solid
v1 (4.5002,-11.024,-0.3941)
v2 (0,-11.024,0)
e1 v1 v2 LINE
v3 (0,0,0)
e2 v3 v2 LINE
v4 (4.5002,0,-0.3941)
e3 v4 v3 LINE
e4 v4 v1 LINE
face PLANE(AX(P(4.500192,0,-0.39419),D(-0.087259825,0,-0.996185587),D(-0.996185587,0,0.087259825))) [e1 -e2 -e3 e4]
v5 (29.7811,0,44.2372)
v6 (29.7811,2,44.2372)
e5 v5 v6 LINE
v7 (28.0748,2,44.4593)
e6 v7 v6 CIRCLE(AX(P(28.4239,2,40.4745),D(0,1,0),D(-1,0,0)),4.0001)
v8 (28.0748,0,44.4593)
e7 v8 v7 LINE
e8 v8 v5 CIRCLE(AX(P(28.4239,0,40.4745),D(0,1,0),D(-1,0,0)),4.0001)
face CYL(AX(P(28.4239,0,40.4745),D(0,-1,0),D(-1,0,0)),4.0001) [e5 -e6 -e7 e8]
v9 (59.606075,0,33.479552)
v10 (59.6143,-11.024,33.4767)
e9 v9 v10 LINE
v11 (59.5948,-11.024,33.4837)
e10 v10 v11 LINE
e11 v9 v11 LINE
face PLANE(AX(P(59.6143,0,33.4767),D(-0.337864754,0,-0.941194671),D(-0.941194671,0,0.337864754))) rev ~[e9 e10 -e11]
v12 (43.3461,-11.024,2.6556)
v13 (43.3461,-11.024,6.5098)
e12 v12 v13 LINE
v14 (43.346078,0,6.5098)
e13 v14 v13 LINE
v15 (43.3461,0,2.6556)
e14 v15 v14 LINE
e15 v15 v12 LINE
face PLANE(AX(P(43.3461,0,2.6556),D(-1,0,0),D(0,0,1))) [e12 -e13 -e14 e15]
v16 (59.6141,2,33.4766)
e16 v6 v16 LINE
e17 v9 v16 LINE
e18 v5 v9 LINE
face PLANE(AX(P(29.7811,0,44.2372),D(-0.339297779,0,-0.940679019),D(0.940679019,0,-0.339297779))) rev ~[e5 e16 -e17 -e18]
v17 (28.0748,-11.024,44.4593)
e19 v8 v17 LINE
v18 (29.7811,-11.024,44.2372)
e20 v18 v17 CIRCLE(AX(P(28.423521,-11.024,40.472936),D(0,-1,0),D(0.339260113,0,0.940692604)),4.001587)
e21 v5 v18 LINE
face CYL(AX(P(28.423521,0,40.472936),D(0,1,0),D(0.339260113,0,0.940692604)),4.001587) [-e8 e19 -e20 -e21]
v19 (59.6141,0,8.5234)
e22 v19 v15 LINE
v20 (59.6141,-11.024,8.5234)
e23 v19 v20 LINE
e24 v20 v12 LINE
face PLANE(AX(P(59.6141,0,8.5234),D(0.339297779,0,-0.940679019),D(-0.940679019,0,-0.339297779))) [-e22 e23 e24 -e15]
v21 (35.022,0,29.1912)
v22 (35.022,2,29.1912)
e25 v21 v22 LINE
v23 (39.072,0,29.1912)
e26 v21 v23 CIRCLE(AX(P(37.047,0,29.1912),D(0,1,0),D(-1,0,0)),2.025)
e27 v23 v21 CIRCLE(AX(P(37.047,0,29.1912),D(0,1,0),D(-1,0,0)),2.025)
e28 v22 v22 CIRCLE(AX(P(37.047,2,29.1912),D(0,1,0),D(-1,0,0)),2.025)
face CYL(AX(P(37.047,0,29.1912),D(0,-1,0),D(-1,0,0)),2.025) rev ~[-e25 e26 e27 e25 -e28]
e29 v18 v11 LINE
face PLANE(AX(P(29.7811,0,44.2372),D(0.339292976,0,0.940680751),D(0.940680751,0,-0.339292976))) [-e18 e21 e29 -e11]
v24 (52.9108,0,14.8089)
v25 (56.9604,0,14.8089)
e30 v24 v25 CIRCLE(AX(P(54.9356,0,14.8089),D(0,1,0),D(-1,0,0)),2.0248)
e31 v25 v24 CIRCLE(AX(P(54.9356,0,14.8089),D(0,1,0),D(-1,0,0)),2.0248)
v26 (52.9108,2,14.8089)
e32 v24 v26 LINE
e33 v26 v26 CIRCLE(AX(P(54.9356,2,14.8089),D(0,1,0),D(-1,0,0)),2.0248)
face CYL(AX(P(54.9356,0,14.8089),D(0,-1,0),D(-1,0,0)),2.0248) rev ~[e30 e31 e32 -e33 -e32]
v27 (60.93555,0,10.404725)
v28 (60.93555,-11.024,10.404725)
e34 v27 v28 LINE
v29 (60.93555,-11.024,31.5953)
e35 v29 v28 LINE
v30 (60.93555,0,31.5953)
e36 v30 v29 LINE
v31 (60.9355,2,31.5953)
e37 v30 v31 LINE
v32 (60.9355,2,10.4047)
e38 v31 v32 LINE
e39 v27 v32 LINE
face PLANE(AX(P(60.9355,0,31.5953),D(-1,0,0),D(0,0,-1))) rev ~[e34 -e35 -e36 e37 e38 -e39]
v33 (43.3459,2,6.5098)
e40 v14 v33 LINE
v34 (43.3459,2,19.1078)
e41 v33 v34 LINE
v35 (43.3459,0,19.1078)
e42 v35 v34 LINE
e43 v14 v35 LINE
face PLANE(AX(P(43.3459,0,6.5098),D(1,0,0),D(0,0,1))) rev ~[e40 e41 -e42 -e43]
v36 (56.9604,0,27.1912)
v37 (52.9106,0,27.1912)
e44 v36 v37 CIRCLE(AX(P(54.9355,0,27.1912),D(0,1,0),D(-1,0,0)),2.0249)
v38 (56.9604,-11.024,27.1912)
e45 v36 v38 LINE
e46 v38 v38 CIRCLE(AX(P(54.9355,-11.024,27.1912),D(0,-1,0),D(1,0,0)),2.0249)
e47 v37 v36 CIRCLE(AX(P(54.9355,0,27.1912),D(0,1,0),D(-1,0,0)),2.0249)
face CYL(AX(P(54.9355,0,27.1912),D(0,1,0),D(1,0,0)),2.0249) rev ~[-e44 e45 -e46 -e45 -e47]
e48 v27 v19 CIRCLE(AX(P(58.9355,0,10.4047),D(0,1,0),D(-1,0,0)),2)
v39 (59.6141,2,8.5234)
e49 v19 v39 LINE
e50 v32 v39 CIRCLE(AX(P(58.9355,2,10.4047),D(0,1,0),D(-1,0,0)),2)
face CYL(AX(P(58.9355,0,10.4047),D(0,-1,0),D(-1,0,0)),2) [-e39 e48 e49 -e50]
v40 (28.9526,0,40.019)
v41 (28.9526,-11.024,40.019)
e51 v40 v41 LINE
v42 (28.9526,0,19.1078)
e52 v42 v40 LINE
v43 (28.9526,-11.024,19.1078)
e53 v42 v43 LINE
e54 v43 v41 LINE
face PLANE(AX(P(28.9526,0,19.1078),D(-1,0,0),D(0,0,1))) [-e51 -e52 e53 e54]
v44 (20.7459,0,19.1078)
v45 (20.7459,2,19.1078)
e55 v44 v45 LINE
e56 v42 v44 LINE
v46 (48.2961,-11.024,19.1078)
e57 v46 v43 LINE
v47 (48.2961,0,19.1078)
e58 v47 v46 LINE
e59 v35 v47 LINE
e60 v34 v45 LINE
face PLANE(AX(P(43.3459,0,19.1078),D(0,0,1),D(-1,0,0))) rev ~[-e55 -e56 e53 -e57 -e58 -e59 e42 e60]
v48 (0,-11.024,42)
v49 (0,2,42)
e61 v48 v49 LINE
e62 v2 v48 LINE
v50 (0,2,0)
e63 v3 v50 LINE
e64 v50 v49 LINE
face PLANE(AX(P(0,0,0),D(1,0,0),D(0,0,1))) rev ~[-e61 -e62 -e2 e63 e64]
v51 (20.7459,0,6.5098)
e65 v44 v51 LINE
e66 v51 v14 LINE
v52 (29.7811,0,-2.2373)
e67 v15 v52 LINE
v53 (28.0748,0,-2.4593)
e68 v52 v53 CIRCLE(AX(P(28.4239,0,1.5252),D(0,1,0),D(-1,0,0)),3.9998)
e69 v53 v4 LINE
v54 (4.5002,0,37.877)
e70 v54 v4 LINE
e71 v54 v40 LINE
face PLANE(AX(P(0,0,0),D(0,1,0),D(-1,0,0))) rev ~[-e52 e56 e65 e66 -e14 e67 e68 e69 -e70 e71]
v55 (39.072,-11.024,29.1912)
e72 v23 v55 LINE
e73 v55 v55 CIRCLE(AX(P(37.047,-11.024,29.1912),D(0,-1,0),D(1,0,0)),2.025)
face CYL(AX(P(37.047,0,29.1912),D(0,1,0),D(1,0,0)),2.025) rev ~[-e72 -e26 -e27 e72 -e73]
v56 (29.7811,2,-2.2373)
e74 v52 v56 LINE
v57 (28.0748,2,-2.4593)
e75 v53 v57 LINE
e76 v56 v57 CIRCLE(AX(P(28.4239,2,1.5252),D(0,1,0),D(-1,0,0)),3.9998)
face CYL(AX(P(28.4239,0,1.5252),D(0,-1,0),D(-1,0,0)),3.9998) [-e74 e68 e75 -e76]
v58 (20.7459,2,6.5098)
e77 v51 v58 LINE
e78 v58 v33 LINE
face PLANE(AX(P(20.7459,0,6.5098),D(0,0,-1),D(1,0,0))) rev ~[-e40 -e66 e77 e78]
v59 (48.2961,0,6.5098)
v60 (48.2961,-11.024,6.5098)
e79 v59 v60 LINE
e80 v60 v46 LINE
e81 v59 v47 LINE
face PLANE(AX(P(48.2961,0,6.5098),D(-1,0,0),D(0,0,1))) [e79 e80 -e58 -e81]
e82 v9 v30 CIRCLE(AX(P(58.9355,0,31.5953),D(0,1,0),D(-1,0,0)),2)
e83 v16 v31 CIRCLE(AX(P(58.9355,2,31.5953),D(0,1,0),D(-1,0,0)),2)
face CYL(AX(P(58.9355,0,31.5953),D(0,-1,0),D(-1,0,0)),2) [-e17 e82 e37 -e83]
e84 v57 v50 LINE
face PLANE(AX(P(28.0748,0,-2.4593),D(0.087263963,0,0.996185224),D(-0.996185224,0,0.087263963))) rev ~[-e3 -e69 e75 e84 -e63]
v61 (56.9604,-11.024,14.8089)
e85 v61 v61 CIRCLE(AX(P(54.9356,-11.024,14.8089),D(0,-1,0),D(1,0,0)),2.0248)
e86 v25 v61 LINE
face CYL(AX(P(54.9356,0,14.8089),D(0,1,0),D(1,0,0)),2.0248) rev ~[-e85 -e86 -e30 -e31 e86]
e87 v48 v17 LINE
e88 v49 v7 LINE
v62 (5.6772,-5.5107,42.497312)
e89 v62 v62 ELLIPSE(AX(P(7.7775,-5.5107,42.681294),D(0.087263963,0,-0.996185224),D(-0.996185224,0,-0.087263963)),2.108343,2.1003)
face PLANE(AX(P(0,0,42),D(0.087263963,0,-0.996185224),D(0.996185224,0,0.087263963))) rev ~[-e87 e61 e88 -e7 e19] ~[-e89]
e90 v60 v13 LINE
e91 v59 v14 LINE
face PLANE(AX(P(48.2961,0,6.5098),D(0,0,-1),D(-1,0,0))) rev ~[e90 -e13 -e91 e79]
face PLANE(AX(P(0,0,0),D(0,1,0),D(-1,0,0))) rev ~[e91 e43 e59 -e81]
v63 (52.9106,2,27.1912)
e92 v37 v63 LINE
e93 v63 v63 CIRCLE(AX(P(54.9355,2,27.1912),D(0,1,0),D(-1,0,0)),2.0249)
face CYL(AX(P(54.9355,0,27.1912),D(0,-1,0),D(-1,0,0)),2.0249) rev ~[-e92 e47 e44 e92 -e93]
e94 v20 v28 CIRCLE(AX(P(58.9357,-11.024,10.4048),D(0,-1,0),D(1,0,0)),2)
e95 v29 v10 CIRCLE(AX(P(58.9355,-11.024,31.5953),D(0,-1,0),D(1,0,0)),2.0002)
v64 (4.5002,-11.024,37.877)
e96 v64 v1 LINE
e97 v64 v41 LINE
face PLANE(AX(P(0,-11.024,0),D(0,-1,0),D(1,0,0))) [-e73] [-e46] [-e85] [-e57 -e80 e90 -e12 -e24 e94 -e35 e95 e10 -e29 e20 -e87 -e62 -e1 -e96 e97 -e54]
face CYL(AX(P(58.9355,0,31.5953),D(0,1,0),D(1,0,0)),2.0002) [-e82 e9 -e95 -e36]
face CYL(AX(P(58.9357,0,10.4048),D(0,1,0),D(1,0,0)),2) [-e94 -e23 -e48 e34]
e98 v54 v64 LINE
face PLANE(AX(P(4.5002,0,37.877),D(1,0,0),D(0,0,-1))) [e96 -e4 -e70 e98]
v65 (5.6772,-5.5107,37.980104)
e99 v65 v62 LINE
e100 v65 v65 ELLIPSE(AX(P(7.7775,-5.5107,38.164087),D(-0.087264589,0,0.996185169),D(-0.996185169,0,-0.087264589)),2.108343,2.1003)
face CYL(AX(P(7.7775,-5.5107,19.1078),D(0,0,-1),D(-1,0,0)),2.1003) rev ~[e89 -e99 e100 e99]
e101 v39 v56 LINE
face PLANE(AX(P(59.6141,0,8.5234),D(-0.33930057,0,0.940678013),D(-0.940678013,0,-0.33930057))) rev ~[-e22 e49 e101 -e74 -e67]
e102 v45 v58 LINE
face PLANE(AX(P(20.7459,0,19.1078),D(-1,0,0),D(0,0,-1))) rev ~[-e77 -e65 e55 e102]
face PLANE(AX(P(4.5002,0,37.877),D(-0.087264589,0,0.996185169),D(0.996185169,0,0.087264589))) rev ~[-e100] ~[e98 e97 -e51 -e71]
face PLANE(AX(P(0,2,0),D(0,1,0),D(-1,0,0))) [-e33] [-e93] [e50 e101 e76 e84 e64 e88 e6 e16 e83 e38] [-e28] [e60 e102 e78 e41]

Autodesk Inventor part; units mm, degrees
ref_plane "YZ Plane" through (0, 0, 0) normal (1, 0, 0) x (0, 1, 0)
ref_plane "XZ Plane" through (0, 0, 0) normal (0, 1, 0) x (-1, 0, 0)
ref_plane "XY Plane" through (0, 0, 0) normal (0, 0, 1) x (1, 0, 0)
sketch "Szkic1" plane through (0, 0, 0) normal (0, 1, 0) x (-1, 0, 0)
  line L0 (0, 0) -> (0, 42)
  line L1 (-28.0748, -2.4593) -> (0, 0)
  line L2 (-59.6141, 8.5234) -> (-29.7811, -2.2373)
  circle A0 centre (-54.9356, 14.8089) radius 2.0248
  circle A1 centre (-54.9355, 27.1912) radius 2.0249
  circle A2 centre (-37.047, 29.1912) radius 2.025
  line L3 (0, 42) -> (-28.0748, 44.4593)
  line L4 (-29.7811, 44.2372) -> (-59.6141, 33.4766)
  circle A3 centre (-28.4239, 40.4745) radius 4.0001
  circle A4 centre (-58.9355, 31.5953) radius 2
  line L5 (-60.9355, 31.5953) -> (-60.9355, 10.4047)
  circle A5 centre (-58.9355, 10.4047) radius 2
  circle A6 centre (-28.4239, 1.5252) radius 3.9998
  line L6 (-43.3459, 19.1078) -> (-20.7459, 19.1078)
  line L7 (-20.7459, 19.1078) -> (-20.7459, 6.5098)
  line L8 (-20.7459, 6.5098) -> (-43.3459, 6.5098)
  line L9 (-43.3459, 6.5098) -> (-43.3459, 19.1078)
  point P0 (-40, 21)
extrude "Wyciągnięcie proste1" add sketch "Szkic1" along normal blind 2
sketch "Szkic2" plane through (0, 0, 0) normal (0, -1, 0) x (1, 0, 0)
  line L0 (4.5002, 37.877) -> (28.9526, 40.019)
  line L1 (28.9526, 19.1078) -> (28.9526, 40.019)
  line L2 (43.3459, 19.1078) -> (48.2961, 19.1078)
  line L3 (48.2961, 6.5098) -> (48.2961, 19.1078)
  line L4 (43.3461, 2.6556) -> (43.3461, 6.5098)
  line L5 (48.2961, 6.5098) -> (43.3459, 6.5098)
  circle A0 centre (58.9357, 10.4048) radius 2
  line L6 (59.6143, 33.4767) -> (59.5948, 33.4837)
  circle A1 centre (58.9355, 31.5953) radius 2.0002
  line L7 (4.5002, 37.877) -> (4.5002, -0.3941)
  line L8 (28.075, -2.4592) -> (28.052, -2.4572)
  arc A2 (60.9355, 31.5953) -> (59.6141, 33.4766) centre (58.9355, 31.5953) ccw projected
  arc A3 (59.6141, 8.5234) -> (60.9355, 10.4047) centre (58.9355, 10.4047) ccw projected
  circle A4 centre (37.047, 29.1912) radius 2.025 projected
  circle A5 centre (54.9356, 14.8089) radius 2.0248 projected
  circle A6 centre (54.9355, 27.1912) radius 2.0249 projected
  line L9 (0, 42) -> (28.0748, 44.4593) projected
  line L10 (0, 0) -> (0, 42) projected
  line L11 (28.0748, -2.4593) -> (0, 0) projected
  arc A7 (28.0748, -2.4593) -> (29.7811, -2.2372) centre (28.4239, 1.5252) ccw projected
  line L12 (59.6141, 8.5234) -> (29.7811, -2.2372) projected
  arc A8 (59.6141, 8.5234) -> (60.9355, 10.4047) centre (58.9355, 10.4047) ccw projected
  line L13 (60.9355, 31.5953) -> (60.9355, 10.4047) projected
  arc A9 (60.9355, 31.5953) -> (59.6141, 33.4766) centre (58.9355, 31.5953) ccw projected
  line L14 (29.7811, 44.2372) -> (59.6141, 33.4766) projected
  arc A10 (29.7811, 44.2372) -> (28.0748, 44.4593) centre (28.4239, 40.4745) ccw projected
  circle A11 centre (37.047, 29.1912) radius 2.025 projected
  circle A12 centre (54.9356, 14.8089) radius 2.0248 projected
  circle A13 centre (54.9355, 27.1912) radius 2.0249 projected
  line L15 (43.3459, 6.5098) -> (43.3459, 19.1078) projected
  line L16 (20.7459, 6.5098) -> (43.3459, 6.5098) projected
  line L17 (20.7459, 19.1078) -> (20.7459, 6.5098) projected
  line L18 (43.3459, 19.1078) -> (20.7459, 19.1078) projected
  line L19 (4.5002, -0.3941) -> (4.5002, -2.2372)
  line L20 (28.9526, 19.1078) -> (28.9526, 16.8338)
  line L21 (43.3459, 6.5098) -> (42.3677, 6.5098)
  line L22 (43.3459, 6.5098) -> (43.3459, 8.4048)
  line L23 (43.3459, 6.5098) -> (43.3459, 19.1078) projected
  line L24 (43.3459, 19.1078) -> (42.3677, 19.1078)
  line L25 (43.3459, 19.1078) -> (43.3459, 17.9708)
  point P0 (40.0002, 21.0001)
  point P1 (59.6047, 8.52)
  point P2 (60.9355, 10.4349)
  point P3 (60.9355, 31.5648)
  point P4 (59.5854, 33.487)
  point P5 (4.5002, -0.3942)
  point P6 (28.9526, 19.1078)
  point P7 (43.3461, 2.6556)
extrude "Wyciągnięcie proste2" add sketch "Szkic2" along normal blind 11.024 contours L7 L11 L10 L9 A10 L14 A1 L13 A0 L12 L4 L5 L3 L2 L18 L1 L0 | A0 | L6 A1
sketch "Szkic3" plane through (43.3459, 2, 19.1078) normal (0, 0, -1) x (-1, 0, 0)
  circle A0 centre (35.5684, -7.5107) radius 2.1003
  point P0 (43.3459, -2)
extrude "Wyciągnięcie proste3" cut sketch "Szkic3" against normal through all
properties part number "base_edited"
